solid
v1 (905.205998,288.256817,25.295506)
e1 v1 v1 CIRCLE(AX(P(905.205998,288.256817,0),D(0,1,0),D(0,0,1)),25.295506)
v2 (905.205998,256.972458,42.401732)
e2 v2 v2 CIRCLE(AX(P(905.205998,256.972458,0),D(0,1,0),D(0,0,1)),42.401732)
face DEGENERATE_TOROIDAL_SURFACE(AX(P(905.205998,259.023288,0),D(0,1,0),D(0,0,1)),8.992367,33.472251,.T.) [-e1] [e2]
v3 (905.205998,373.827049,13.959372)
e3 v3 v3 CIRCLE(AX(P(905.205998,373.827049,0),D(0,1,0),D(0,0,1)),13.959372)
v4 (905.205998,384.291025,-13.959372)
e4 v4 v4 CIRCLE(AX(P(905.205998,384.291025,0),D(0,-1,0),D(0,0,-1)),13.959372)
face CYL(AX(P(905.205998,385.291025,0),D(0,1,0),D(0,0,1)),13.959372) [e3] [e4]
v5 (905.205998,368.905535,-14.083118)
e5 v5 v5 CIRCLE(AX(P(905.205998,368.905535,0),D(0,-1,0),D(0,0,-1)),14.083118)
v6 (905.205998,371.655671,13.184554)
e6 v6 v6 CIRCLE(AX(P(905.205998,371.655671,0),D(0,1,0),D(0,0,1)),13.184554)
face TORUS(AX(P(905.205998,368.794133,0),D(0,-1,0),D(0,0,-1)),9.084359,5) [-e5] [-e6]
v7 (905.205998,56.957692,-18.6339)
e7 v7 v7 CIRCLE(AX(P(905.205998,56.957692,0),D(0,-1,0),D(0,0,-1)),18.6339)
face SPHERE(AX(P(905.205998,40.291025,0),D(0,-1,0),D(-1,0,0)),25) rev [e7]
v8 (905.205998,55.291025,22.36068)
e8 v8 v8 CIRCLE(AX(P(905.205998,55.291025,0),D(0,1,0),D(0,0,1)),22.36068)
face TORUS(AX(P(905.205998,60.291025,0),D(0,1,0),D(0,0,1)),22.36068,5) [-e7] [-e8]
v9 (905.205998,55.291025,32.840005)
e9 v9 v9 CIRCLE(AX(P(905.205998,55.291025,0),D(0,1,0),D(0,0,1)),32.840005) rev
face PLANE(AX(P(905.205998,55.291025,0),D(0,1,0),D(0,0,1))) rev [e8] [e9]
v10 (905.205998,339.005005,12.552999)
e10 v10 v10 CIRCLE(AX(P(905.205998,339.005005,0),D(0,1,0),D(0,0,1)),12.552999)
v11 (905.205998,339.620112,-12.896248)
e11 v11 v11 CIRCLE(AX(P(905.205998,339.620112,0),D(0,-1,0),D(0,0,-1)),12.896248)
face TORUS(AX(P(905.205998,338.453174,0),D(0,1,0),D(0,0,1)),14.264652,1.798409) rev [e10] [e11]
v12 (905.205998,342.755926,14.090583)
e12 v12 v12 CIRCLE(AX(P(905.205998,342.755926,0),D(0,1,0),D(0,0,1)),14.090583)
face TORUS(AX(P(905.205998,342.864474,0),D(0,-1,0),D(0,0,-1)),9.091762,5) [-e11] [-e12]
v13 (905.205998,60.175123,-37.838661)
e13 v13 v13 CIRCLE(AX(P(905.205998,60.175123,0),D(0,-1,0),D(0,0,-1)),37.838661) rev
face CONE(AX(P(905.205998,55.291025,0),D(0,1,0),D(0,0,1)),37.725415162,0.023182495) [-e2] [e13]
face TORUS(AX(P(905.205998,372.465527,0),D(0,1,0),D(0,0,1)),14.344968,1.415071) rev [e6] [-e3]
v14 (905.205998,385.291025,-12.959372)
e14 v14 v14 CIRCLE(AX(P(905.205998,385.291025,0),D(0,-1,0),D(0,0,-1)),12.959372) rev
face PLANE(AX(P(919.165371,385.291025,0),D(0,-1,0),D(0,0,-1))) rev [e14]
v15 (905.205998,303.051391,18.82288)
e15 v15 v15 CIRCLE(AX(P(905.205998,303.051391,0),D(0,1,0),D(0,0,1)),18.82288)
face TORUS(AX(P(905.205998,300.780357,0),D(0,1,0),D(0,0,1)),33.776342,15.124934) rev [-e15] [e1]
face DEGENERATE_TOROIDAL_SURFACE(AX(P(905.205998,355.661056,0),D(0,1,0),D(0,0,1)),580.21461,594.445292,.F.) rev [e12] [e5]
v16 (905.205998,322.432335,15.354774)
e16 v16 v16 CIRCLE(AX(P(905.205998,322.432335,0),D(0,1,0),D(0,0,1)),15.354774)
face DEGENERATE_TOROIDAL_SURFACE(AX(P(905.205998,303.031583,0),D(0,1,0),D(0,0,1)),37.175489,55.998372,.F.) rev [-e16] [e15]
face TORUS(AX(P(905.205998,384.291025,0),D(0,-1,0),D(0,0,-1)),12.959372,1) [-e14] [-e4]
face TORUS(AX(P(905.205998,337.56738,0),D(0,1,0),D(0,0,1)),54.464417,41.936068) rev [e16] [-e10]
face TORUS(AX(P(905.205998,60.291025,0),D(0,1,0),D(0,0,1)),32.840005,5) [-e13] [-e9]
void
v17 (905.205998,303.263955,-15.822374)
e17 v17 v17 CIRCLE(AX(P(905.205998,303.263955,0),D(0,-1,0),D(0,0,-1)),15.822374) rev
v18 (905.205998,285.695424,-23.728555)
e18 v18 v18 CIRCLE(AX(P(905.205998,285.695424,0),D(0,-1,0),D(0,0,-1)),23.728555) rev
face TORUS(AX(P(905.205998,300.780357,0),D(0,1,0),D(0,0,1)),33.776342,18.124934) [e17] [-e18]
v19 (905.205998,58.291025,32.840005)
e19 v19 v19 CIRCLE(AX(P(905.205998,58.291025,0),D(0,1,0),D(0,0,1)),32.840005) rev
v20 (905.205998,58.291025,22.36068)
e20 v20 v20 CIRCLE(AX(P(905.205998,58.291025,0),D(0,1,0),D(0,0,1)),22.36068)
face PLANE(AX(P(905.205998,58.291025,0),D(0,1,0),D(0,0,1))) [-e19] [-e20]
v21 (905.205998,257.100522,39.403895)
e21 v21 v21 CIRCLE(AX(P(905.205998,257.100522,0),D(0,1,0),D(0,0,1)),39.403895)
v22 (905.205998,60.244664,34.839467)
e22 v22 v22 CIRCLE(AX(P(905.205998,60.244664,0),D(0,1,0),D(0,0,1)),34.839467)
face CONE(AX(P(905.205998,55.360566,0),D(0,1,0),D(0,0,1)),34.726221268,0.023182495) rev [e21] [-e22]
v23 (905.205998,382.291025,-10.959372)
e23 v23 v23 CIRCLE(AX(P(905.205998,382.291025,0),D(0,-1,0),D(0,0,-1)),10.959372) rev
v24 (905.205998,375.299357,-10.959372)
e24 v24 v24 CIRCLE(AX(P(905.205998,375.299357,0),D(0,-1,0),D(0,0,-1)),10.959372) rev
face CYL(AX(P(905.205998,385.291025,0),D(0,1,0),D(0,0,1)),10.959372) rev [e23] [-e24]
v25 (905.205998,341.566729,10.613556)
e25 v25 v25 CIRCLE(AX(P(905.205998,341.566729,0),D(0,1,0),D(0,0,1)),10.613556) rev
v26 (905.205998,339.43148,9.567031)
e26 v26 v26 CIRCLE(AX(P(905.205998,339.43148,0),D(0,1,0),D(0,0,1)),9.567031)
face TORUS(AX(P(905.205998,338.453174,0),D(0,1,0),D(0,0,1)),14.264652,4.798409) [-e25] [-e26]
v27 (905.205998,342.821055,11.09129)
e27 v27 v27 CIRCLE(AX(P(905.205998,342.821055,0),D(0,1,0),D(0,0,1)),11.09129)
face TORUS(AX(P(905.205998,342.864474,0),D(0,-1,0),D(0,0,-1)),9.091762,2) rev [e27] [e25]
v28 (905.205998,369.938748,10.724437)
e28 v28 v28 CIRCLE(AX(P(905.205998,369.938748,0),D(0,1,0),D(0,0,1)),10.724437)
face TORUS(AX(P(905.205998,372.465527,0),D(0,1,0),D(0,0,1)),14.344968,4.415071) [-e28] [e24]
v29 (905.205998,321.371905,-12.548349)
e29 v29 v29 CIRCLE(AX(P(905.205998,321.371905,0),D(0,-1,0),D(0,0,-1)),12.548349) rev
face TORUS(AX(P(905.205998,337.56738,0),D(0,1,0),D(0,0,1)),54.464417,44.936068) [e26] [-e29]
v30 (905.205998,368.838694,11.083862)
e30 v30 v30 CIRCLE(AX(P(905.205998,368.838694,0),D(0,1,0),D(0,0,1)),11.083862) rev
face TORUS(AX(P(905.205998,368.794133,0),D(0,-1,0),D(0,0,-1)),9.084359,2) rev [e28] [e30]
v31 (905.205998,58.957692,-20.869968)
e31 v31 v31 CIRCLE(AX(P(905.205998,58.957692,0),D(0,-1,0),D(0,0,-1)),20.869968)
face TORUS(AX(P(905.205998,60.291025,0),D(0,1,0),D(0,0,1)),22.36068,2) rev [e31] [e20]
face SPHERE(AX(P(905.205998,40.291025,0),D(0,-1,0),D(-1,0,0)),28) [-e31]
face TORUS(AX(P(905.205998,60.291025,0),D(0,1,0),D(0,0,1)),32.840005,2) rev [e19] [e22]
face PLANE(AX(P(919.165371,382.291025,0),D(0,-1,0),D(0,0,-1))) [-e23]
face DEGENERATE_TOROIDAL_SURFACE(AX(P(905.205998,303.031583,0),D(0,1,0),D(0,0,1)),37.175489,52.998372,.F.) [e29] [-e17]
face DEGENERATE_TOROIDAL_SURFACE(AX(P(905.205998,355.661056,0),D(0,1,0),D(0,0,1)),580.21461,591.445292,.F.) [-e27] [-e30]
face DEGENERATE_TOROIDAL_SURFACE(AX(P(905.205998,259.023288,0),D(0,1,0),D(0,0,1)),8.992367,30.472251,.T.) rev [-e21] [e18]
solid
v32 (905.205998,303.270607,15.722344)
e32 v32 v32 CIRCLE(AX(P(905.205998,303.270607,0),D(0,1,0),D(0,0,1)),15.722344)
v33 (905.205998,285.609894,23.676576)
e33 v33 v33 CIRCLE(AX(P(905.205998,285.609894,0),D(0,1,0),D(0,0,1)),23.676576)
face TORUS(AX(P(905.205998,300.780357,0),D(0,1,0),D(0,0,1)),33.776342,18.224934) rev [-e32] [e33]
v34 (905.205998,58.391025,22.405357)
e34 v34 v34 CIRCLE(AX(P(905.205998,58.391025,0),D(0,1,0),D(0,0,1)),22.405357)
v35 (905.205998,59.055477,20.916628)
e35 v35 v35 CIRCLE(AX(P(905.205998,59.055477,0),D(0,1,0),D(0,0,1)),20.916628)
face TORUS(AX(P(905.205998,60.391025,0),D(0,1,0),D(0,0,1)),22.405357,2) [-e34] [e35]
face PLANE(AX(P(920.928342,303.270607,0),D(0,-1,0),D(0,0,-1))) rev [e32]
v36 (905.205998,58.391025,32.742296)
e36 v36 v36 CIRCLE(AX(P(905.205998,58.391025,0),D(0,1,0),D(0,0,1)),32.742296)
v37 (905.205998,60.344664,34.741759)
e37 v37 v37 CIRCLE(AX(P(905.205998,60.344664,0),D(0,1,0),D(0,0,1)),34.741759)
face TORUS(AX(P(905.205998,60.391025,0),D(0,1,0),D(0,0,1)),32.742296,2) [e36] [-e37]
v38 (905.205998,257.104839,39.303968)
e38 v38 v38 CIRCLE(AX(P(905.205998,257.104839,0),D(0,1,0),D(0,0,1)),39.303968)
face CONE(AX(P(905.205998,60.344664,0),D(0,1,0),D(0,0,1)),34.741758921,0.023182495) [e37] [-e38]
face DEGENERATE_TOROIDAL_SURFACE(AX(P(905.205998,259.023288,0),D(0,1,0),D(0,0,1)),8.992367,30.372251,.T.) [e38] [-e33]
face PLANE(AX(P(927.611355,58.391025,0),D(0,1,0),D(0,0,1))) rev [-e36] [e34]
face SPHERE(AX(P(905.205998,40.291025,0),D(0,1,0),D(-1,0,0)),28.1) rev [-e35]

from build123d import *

# Parameters (mm, degrees)
FILLET1_R = 5
FILLET2_R = 5
FILLET3_R = 1
FILLET4_R = 5


# Read off the part's stored shape, not the designer's step: Shell2
with BuildPart() as part:
    # Sketch1 → Revolve1 (revolve)
    with BuildSketch(Plane.XY, mode=Mode.PRIVATE) as revolve1_sk:
        with BuildLine():
            Line((905.205998229, 55.291025129), (942.931413391, 55.291025129))
            Line((942.931413391, 55.291025129), (947.607730062, 256.972458171))
            ThreePointArc((947.607730062, 256.972458171), (943.566903445, 275.081946804), (930.501504315, 288.25681697))
            ThreePointArc((930.501504315, 288.25681697), (925.125521395, 294.717998181), (924.028878356, 303.05139059))
            ThreePointArc((924.028878356, 303.05139059), (923.153292748, 312.895480238), (920.560772542, 322.432334548))
            ThreePointArc((920.560772542, 322.432334548), (918.321093309, 330.576863672), (917.758997126, 339.005004961))
            ThreePointArc((917.758997126, 339.005004961), (918.319336987, 339.834749552), (919.236524099, 340.236277439))
            ThreePointArc((919.236524099, 340.236277439), (919.436680318, 355.661055591), (919.236524099, 371.085833742))
            ThreePointArc((919.236524099, 371.085833742), (918.136371488, 372.428808232), (919.165370574, 373.82704896))
            Line((919.165370574, 373.82704896), (919.165370574, 385.291025129))
            Line((919.165370574, 385.291025129), (905.205998229, 385.291025129))
            Line((905.205998229, 385.291025129), (905.205998229, 55.291025129))
        make_face()
    revolve(revolve1_sk.sketch.rotate(Axis((905.205998229, 385.291025129, 0), (0, -1, 0)), 90), axis=Axis((905.205998229, 385.291025129, 0), (0, -1, 0)))

    # Fillet1
    fillet1_edges = [part.edges().sort_by_distance(p)[0] for p in [
        (905.205998229, 55.291025129, -37.725415162),
    ]]
    fillet(fillet1_edges, radius=FILLET1_R)

    # Fillet2
    fillet2_edges = [part.edges().sort_by_distance(p)[0] for p in [
        (905.205998229, 340.236277439, -14.03052587),
        (905.205998229, 371.085833742, -14.03052587),
    ]]
    fillet(fillet2_edges, radius=FILLET2_R)

    # Fillet3
    fillet3_edges = [part.edges().sort_by_distance(p)[0] for p in [
        (905.205998229, 385.291025129, -13.959372344),
    ]]
    fillet(fillet3_edges, radius=FILLET3_R)

    # Sketch5 → Cut-Revolve1 (revolve, cut)
    with BuildSketch(Plane.XY):
        with BuildLine():
            Line((905.205998229, 65.291025129), (905.205998229, 15.291025129))
            ThreePointArc((905.205998229, 15.291025129), (930.205998229, 40.291025129), (905.205998229, 65.291025129))
        make_face()
    revolve(axis=Axis((905.205998229, 15.291025129, 0), (0, 1, 0)), mode=Mode.SUBTRACT)

    # Fillet4
    fillet4_edges = [part.edges().sort_by_distance(p)[0] for p in [
        (885.205998229, 55.291025129, 0),
    ]]
    fillet(fillet4_edges, radius=FILLET4_R)

    # Shell2 outline → Shell2 (revolve, cut)
    with BuildSketch(Plane(origin=(905.205998229, 0, 0), x_dir=(1, 0, 0), z_dir=(0, 0, 1))):
        with BuildLine():
            ThreePointArc((20.86996779, 58.957691795), (21.544183194, 58.46528327), (22.360679775, 58.291025129))
            Line((22.360679775, 58.291025129), (32.840004537, 58.291025129))
            ThreePointArc((32.840004537, 58.291025129), (34.237730963, 58.860514437), (34.839467133, 60.24466429))
            Line((34.839467133, 60.24466429), (39.403894875, 257.100521731))
            ThreePointArc((39.403894875, 257.100521731), (35.713073699, 273.671219236), (23.728555088, 285.695423594))
            ThreePointArc((23.728555088, 285.695423594), (17.247945658, 293.342256432), (15.822374209, 303.263954729))
            ThreePointArc((15.822374209, 303.263954729), (14.977281296, 312.461113556), (12.548349187, 321.371904842))
            ThreePointArc((12.548349187, 321.371904842), (10.128415763, 330.248285805), (9.567031047, 339.431480454))
            ThreePointArc((9.567031047, 339.431480454), (9.955929531, 340.564959038), (10.613556209, 341.566728913))
            ThreePointArc((10.613556209, 341.566728913), (10.960788914, 342.152618702), (11.091290454, 342.821054745))
            ThreePointArc((11.091290454, 342.821054745), (11.230657984, 355.829915293), (11.083862327, 368.838694141))
            ThreePointArc((11.083862327, 368.838694141), (10.985455484, 369.415286635), (10.724437, 369.938748344))
            ThreePointArc((10.724437, 369.938748344), (9.934130791, 372.658837185), (10.959372344, 375.299357393))
            Line((10.959372344, 375.299357393), (10.959372344, 382.291025129))
            Line((10.959372344, 382.291025129), (0, 382.291025129))
            Line((0, 382.291025129), (0, 68.291025129))
            ThreePointArc((0, 68.291025129), (11.43095214, 65.851411143), (20.86996779, 58.957691795))
        make_face()
    revolve(axis=Axis((905.205998229, 0, 0), (0, 1, 0)), mode=Mode.SUBTRACT)


with BuildPart() as body_2:
    # Sketch6 → Revolve2 (revolve)
    with BuildSketch(Plane.XY, mode=Mode.PRIVATE) as revolve2_sk:
        with BuildLine():
            Line((905.205998229, 303.270607144), (905.205998229, 68.391025129))
            ThreePointArc((905.205998229, 68.391025129), (916.65870323, 65.951218974), (926.122626725, 59.055476956))
            ThreePointArc((926.122626725, 59.055476956), (926.796215586, 58.564676812), (927.611354732, 58.391025129))
            Line((927.611354732, 58.391025129), (937.948294554, 58.391025129))
            ThreePointArc((937.948294554, 58.391025129), (939.34602098, 58.960514437), (939.94775715, 60.34466429))
            Line((939.94775715, 60.34466429), (944.509966332, 257.104839064))
            ThreePointArc((944.509966332, 257.104839064), (940.830869203, 273.624087222), (928.882574195, 285.609893903))
            ThreePointArc((928.882574195, 285.609893903), (922.365065832, 293.296079876), (920.928341834, 303.270607144))
            Line((920.928341834, 303.270607144), (905.205998229, 303.270607144))
        make_face()
    revolve(revolve2_sk.sketch.rotate(Axis((905.205998229, 385.291025129, 0), (0, -1, 0)), 90), axis=Axis((905.205998229, 385.291025129, 0), (0, -1, 0)))


solid = Compound([part.part, body_2.part])
